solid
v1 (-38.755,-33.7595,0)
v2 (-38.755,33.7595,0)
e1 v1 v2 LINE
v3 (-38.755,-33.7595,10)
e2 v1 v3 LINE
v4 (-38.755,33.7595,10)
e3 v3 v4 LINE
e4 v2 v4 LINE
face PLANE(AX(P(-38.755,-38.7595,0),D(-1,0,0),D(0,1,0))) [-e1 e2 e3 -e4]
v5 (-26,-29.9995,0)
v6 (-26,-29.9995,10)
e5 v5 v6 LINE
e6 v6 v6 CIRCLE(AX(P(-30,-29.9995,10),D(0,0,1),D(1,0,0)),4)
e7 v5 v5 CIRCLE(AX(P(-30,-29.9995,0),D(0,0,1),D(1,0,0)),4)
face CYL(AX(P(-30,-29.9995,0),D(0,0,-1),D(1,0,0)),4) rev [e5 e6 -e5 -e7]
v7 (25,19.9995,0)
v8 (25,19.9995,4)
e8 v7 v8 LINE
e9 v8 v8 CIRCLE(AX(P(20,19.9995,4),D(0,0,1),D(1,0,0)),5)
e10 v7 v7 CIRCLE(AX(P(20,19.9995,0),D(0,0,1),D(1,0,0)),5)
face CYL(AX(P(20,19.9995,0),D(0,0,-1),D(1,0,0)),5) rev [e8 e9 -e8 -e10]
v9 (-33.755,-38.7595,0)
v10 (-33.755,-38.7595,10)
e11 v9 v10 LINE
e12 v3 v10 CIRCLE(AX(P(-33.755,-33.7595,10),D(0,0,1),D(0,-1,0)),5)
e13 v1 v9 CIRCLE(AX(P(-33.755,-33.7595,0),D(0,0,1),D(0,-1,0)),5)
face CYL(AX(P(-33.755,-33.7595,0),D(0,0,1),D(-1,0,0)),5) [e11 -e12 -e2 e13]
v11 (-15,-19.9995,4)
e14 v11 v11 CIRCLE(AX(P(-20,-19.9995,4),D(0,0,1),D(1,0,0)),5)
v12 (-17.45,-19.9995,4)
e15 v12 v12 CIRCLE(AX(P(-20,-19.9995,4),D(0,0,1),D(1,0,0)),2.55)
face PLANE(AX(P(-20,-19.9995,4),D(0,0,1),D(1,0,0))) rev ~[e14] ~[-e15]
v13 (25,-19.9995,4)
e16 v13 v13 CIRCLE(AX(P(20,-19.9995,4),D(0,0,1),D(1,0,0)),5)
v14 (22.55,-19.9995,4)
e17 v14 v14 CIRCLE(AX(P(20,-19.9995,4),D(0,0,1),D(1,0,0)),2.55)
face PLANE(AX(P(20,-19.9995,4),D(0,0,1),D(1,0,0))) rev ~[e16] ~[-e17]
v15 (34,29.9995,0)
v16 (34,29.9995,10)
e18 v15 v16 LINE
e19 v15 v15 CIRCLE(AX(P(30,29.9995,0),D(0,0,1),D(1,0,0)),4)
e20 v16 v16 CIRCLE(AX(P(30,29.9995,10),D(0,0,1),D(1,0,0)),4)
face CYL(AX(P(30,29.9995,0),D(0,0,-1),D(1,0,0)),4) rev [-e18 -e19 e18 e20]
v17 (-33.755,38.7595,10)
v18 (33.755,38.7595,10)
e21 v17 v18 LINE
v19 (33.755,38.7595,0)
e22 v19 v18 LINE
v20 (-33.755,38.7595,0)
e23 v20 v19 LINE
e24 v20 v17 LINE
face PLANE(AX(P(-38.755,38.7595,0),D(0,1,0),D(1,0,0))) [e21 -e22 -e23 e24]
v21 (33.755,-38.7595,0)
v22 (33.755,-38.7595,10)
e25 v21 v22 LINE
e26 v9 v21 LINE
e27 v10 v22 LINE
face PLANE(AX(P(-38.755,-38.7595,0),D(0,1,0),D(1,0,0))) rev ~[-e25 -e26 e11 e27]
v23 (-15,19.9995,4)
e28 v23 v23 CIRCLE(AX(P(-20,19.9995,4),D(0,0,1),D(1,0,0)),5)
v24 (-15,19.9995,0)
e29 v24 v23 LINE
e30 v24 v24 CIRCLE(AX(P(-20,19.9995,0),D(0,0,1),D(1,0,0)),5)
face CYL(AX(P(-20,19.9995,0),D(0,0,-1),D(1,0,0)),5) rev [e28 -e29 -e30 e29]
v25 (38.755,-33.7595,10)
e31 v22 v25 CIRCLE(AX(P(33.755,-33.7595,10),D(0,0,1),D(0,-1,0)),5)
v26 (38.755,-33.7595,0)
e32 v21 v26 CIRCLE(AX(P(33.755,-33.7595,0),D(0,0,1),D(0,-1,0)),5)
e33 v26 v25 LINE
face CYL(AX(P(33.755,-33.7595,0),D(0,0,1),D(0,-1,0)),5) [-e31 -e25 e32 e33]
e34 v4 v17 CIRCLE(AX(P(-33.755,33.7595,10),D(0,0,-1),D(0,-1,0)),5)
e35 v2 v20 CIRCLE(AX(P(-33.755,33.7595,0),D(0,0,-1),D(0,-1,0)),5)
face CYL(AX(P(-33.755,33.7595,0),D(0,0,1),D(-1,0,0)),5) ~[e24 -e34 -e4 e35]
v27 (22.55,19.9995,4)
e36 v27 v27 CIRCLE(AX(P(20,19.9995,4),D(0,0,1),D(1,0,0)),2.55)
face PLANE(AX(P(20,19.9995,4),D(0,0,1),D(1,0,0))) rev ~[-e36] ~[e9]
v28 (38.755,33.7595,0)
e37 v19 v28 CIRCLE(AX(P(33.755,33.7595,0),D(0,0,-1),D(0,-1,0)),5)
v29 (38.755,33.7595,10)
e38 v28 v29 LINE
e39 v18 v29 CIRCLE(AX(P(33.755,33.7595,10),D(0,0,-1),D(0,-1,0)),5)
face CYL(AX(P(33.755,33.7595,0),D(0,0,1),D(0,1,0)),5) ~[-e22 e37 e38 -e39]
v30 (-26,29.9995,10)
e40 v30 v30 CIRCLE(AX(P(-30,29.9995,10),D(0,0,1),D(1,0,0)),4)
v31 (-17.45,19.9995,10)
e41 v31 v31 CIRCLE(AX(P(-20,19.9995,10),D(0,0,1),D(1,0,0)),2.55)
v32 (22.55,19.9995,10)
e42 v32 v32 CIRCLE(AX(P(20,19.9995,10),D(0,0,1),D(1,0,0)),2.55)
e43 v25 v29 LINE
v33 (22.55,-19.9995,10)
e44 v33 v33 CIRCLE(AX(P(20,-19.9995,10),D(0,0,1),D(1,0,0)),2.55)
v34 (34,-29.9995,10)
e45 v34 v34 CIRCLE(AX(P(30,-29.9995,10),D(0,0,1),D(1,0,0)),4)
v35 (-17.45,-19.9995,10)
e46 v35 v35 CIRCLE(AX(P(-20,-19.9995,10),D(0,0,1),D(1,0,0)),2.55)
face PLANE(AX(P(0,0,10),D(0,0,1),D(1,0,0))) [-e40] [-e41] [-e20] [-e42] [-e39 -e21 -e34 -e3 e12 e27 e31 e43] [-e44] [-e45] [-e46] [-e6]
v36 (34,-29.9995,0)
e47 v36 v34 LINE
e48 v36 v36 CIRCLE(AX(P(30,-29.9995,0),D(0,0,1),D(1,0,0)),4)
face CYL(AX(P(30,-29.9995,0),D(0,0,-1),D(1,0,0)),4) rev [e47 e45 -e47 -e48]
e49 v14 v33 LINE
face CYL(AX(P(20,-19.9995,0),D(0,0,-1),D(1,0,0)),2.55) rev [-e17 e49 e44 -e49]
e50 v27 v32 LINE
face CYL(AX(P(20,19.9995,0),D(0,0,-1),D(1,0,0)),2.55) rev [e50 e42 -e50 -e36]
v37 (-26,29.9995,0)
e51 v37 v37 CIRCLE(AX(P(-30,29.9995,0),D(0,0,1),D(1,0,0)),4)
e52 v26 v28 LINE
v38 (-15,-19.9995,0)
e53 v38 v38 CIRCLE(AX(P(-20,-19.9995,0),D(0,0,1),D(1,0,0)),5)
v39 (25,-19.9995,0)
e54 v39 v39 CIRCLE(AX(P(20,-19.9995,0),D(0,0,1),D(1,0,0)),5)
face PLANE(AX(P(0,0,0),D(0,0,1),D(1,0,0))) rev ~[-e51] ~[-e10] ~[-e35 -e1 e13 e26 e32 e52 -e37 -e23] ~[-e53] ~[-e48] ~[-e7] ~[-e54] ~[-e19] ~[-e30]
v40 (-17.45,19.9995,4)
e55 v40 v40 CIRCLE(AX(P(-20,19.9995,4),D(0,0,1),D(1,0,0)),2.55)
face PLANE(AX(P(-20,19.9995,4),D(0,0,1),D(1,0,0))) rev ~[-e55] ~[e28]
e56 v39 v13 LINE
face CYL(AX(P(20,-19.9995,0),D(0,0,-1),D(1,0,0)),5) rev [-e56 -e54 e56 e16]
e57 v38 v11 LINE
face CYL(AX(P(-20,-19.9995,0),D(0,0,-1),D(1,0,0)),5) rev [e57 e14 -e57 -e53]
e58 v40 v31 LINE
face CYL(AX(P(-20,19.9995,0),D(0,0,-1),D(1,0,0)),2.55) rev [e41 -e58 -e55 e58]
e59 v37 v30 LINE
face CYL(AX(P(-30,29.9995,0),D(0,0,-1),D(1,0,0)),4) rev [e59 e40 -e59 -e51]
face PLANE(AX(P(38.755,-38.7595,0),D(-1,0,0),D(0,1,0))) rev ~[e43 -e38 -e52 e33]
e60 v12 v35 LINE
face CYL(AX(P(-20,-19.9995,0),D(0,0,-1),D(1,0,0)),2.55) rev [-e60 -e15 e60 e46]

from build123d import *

# Parameters (mm, degrees)
F0_W     = 77.51
F0_H     = 77.519
F0_R     = 4
F0_R_2   = 5
F0_R_3   = 2.55
F1_DEPTH = 10
F2_R     = 5
F3_DEPTH = 4


# Not quite as in the source:
# - a feature names something its author has since deleted; it is built from what else it names


with BuildPart() as f1:
    # F0 (on Top) → F1 (new body)
    with BuildSketch(Plane.XY):
        Rectangle(F0_W, F0_H)
        with Locations((-30, -29.9995)):
            Circle(F0_R, mode=Mode.SUBTRACT)
        with Locations((-20, -19.9995)):
            Circle(F0_R_2, mode=Mode.SUBTRACT)
        with Locations((30, -29.9995)):
            Circle(F0_R, mode=Mode.SUBTRACT)
        with Locations((20, -19.9995)):
            Circle(F0_R_2, mode=Mode.SUBTRACT)
        with Locations((-20, 19.9995)):
            Circle(F0_R_2, mode=Mode.SUBTRACT)
        with Locations((-30, 29.9995)):
            Circle(F0_R, mode=Mode.SUBTRACT)
        with Locations((20, 19.9995)):
            Circle(F0_R_2, mode=Mode.SUBTRACT)
        with Locations((30, 29.9995)):
            Circle(F0_R, mode=Mode.SUBTRACT)
        with Locations((-20, 19.9995)):
            Circle(F0_R_2)
        with Locations((-20, 19.9995)):
            Circle(F0_R_3, mode=Mode.SUBTRACT)
        with Locations((20, 19.9995)):
            Circle(F0_R_2)
        with Locations((20, 19.9995)):
            Circle(F0_R_3, mode=Mode.SUBTRACT)
        with Locations((20, -19.9995)):
            Circle(F0_R_2)
        with Locations((20, -19.9995)):
            Circle(F0_R_3, mode=Mode.SUBTRACT)
        with Locations((-20, -19.9995)):
            Circle(F0_R_2)
        with Locations((-20, -19.9995)):
            Circle(F0_R_3, mode=Mode.SUBTRACT)
    extrude(amount=F1_DEPTH)

    # F2
    f2_edges = [f1.edges().sort_by_distance(p)[0] for p in [
        (38.755, -38.7595, 5),
        (-38.755, -38.7595, 5),
        (38.755, 38.7595, 5),
        (-38.755, 38.7595, 5),
    ]]
    fillet(f2_edges, radius=F2_R)

    # F0 (on Top) → F3 (cut)
    with BuildSketch(Plane.XY):
        with Locations((-20, 19.9995)):
            Circle(F0_R_2)
        with Locations((-20, 19.9995)):
            Circle(F0_R_3, mode=Mode.SUBTRACT)
        with Locations((20, 19.9995)):
            Circle(F0_R_2)
        with Locations((20, 19.9995)):
            Circle(F0_R_3, mode=Mode.SUBTRACT)
        with Locations((-20, -19.9995)):
            Circle(F0_R_2)
        with Locations((-20, -19.9995)):
            Circle(F0_R_3, mode=Mode.SUBTRACT)
        with Locations((20, -19.9995)):
            Circle(F0_R_2)
        with Locations((20, -19.9995)):
            Circle(F0_R_3, mode=Mode.SUBTRACT)
    extrude(amount=F3_DEPTH, mode=Mode.SUBTRACT)


solid = f1.part
